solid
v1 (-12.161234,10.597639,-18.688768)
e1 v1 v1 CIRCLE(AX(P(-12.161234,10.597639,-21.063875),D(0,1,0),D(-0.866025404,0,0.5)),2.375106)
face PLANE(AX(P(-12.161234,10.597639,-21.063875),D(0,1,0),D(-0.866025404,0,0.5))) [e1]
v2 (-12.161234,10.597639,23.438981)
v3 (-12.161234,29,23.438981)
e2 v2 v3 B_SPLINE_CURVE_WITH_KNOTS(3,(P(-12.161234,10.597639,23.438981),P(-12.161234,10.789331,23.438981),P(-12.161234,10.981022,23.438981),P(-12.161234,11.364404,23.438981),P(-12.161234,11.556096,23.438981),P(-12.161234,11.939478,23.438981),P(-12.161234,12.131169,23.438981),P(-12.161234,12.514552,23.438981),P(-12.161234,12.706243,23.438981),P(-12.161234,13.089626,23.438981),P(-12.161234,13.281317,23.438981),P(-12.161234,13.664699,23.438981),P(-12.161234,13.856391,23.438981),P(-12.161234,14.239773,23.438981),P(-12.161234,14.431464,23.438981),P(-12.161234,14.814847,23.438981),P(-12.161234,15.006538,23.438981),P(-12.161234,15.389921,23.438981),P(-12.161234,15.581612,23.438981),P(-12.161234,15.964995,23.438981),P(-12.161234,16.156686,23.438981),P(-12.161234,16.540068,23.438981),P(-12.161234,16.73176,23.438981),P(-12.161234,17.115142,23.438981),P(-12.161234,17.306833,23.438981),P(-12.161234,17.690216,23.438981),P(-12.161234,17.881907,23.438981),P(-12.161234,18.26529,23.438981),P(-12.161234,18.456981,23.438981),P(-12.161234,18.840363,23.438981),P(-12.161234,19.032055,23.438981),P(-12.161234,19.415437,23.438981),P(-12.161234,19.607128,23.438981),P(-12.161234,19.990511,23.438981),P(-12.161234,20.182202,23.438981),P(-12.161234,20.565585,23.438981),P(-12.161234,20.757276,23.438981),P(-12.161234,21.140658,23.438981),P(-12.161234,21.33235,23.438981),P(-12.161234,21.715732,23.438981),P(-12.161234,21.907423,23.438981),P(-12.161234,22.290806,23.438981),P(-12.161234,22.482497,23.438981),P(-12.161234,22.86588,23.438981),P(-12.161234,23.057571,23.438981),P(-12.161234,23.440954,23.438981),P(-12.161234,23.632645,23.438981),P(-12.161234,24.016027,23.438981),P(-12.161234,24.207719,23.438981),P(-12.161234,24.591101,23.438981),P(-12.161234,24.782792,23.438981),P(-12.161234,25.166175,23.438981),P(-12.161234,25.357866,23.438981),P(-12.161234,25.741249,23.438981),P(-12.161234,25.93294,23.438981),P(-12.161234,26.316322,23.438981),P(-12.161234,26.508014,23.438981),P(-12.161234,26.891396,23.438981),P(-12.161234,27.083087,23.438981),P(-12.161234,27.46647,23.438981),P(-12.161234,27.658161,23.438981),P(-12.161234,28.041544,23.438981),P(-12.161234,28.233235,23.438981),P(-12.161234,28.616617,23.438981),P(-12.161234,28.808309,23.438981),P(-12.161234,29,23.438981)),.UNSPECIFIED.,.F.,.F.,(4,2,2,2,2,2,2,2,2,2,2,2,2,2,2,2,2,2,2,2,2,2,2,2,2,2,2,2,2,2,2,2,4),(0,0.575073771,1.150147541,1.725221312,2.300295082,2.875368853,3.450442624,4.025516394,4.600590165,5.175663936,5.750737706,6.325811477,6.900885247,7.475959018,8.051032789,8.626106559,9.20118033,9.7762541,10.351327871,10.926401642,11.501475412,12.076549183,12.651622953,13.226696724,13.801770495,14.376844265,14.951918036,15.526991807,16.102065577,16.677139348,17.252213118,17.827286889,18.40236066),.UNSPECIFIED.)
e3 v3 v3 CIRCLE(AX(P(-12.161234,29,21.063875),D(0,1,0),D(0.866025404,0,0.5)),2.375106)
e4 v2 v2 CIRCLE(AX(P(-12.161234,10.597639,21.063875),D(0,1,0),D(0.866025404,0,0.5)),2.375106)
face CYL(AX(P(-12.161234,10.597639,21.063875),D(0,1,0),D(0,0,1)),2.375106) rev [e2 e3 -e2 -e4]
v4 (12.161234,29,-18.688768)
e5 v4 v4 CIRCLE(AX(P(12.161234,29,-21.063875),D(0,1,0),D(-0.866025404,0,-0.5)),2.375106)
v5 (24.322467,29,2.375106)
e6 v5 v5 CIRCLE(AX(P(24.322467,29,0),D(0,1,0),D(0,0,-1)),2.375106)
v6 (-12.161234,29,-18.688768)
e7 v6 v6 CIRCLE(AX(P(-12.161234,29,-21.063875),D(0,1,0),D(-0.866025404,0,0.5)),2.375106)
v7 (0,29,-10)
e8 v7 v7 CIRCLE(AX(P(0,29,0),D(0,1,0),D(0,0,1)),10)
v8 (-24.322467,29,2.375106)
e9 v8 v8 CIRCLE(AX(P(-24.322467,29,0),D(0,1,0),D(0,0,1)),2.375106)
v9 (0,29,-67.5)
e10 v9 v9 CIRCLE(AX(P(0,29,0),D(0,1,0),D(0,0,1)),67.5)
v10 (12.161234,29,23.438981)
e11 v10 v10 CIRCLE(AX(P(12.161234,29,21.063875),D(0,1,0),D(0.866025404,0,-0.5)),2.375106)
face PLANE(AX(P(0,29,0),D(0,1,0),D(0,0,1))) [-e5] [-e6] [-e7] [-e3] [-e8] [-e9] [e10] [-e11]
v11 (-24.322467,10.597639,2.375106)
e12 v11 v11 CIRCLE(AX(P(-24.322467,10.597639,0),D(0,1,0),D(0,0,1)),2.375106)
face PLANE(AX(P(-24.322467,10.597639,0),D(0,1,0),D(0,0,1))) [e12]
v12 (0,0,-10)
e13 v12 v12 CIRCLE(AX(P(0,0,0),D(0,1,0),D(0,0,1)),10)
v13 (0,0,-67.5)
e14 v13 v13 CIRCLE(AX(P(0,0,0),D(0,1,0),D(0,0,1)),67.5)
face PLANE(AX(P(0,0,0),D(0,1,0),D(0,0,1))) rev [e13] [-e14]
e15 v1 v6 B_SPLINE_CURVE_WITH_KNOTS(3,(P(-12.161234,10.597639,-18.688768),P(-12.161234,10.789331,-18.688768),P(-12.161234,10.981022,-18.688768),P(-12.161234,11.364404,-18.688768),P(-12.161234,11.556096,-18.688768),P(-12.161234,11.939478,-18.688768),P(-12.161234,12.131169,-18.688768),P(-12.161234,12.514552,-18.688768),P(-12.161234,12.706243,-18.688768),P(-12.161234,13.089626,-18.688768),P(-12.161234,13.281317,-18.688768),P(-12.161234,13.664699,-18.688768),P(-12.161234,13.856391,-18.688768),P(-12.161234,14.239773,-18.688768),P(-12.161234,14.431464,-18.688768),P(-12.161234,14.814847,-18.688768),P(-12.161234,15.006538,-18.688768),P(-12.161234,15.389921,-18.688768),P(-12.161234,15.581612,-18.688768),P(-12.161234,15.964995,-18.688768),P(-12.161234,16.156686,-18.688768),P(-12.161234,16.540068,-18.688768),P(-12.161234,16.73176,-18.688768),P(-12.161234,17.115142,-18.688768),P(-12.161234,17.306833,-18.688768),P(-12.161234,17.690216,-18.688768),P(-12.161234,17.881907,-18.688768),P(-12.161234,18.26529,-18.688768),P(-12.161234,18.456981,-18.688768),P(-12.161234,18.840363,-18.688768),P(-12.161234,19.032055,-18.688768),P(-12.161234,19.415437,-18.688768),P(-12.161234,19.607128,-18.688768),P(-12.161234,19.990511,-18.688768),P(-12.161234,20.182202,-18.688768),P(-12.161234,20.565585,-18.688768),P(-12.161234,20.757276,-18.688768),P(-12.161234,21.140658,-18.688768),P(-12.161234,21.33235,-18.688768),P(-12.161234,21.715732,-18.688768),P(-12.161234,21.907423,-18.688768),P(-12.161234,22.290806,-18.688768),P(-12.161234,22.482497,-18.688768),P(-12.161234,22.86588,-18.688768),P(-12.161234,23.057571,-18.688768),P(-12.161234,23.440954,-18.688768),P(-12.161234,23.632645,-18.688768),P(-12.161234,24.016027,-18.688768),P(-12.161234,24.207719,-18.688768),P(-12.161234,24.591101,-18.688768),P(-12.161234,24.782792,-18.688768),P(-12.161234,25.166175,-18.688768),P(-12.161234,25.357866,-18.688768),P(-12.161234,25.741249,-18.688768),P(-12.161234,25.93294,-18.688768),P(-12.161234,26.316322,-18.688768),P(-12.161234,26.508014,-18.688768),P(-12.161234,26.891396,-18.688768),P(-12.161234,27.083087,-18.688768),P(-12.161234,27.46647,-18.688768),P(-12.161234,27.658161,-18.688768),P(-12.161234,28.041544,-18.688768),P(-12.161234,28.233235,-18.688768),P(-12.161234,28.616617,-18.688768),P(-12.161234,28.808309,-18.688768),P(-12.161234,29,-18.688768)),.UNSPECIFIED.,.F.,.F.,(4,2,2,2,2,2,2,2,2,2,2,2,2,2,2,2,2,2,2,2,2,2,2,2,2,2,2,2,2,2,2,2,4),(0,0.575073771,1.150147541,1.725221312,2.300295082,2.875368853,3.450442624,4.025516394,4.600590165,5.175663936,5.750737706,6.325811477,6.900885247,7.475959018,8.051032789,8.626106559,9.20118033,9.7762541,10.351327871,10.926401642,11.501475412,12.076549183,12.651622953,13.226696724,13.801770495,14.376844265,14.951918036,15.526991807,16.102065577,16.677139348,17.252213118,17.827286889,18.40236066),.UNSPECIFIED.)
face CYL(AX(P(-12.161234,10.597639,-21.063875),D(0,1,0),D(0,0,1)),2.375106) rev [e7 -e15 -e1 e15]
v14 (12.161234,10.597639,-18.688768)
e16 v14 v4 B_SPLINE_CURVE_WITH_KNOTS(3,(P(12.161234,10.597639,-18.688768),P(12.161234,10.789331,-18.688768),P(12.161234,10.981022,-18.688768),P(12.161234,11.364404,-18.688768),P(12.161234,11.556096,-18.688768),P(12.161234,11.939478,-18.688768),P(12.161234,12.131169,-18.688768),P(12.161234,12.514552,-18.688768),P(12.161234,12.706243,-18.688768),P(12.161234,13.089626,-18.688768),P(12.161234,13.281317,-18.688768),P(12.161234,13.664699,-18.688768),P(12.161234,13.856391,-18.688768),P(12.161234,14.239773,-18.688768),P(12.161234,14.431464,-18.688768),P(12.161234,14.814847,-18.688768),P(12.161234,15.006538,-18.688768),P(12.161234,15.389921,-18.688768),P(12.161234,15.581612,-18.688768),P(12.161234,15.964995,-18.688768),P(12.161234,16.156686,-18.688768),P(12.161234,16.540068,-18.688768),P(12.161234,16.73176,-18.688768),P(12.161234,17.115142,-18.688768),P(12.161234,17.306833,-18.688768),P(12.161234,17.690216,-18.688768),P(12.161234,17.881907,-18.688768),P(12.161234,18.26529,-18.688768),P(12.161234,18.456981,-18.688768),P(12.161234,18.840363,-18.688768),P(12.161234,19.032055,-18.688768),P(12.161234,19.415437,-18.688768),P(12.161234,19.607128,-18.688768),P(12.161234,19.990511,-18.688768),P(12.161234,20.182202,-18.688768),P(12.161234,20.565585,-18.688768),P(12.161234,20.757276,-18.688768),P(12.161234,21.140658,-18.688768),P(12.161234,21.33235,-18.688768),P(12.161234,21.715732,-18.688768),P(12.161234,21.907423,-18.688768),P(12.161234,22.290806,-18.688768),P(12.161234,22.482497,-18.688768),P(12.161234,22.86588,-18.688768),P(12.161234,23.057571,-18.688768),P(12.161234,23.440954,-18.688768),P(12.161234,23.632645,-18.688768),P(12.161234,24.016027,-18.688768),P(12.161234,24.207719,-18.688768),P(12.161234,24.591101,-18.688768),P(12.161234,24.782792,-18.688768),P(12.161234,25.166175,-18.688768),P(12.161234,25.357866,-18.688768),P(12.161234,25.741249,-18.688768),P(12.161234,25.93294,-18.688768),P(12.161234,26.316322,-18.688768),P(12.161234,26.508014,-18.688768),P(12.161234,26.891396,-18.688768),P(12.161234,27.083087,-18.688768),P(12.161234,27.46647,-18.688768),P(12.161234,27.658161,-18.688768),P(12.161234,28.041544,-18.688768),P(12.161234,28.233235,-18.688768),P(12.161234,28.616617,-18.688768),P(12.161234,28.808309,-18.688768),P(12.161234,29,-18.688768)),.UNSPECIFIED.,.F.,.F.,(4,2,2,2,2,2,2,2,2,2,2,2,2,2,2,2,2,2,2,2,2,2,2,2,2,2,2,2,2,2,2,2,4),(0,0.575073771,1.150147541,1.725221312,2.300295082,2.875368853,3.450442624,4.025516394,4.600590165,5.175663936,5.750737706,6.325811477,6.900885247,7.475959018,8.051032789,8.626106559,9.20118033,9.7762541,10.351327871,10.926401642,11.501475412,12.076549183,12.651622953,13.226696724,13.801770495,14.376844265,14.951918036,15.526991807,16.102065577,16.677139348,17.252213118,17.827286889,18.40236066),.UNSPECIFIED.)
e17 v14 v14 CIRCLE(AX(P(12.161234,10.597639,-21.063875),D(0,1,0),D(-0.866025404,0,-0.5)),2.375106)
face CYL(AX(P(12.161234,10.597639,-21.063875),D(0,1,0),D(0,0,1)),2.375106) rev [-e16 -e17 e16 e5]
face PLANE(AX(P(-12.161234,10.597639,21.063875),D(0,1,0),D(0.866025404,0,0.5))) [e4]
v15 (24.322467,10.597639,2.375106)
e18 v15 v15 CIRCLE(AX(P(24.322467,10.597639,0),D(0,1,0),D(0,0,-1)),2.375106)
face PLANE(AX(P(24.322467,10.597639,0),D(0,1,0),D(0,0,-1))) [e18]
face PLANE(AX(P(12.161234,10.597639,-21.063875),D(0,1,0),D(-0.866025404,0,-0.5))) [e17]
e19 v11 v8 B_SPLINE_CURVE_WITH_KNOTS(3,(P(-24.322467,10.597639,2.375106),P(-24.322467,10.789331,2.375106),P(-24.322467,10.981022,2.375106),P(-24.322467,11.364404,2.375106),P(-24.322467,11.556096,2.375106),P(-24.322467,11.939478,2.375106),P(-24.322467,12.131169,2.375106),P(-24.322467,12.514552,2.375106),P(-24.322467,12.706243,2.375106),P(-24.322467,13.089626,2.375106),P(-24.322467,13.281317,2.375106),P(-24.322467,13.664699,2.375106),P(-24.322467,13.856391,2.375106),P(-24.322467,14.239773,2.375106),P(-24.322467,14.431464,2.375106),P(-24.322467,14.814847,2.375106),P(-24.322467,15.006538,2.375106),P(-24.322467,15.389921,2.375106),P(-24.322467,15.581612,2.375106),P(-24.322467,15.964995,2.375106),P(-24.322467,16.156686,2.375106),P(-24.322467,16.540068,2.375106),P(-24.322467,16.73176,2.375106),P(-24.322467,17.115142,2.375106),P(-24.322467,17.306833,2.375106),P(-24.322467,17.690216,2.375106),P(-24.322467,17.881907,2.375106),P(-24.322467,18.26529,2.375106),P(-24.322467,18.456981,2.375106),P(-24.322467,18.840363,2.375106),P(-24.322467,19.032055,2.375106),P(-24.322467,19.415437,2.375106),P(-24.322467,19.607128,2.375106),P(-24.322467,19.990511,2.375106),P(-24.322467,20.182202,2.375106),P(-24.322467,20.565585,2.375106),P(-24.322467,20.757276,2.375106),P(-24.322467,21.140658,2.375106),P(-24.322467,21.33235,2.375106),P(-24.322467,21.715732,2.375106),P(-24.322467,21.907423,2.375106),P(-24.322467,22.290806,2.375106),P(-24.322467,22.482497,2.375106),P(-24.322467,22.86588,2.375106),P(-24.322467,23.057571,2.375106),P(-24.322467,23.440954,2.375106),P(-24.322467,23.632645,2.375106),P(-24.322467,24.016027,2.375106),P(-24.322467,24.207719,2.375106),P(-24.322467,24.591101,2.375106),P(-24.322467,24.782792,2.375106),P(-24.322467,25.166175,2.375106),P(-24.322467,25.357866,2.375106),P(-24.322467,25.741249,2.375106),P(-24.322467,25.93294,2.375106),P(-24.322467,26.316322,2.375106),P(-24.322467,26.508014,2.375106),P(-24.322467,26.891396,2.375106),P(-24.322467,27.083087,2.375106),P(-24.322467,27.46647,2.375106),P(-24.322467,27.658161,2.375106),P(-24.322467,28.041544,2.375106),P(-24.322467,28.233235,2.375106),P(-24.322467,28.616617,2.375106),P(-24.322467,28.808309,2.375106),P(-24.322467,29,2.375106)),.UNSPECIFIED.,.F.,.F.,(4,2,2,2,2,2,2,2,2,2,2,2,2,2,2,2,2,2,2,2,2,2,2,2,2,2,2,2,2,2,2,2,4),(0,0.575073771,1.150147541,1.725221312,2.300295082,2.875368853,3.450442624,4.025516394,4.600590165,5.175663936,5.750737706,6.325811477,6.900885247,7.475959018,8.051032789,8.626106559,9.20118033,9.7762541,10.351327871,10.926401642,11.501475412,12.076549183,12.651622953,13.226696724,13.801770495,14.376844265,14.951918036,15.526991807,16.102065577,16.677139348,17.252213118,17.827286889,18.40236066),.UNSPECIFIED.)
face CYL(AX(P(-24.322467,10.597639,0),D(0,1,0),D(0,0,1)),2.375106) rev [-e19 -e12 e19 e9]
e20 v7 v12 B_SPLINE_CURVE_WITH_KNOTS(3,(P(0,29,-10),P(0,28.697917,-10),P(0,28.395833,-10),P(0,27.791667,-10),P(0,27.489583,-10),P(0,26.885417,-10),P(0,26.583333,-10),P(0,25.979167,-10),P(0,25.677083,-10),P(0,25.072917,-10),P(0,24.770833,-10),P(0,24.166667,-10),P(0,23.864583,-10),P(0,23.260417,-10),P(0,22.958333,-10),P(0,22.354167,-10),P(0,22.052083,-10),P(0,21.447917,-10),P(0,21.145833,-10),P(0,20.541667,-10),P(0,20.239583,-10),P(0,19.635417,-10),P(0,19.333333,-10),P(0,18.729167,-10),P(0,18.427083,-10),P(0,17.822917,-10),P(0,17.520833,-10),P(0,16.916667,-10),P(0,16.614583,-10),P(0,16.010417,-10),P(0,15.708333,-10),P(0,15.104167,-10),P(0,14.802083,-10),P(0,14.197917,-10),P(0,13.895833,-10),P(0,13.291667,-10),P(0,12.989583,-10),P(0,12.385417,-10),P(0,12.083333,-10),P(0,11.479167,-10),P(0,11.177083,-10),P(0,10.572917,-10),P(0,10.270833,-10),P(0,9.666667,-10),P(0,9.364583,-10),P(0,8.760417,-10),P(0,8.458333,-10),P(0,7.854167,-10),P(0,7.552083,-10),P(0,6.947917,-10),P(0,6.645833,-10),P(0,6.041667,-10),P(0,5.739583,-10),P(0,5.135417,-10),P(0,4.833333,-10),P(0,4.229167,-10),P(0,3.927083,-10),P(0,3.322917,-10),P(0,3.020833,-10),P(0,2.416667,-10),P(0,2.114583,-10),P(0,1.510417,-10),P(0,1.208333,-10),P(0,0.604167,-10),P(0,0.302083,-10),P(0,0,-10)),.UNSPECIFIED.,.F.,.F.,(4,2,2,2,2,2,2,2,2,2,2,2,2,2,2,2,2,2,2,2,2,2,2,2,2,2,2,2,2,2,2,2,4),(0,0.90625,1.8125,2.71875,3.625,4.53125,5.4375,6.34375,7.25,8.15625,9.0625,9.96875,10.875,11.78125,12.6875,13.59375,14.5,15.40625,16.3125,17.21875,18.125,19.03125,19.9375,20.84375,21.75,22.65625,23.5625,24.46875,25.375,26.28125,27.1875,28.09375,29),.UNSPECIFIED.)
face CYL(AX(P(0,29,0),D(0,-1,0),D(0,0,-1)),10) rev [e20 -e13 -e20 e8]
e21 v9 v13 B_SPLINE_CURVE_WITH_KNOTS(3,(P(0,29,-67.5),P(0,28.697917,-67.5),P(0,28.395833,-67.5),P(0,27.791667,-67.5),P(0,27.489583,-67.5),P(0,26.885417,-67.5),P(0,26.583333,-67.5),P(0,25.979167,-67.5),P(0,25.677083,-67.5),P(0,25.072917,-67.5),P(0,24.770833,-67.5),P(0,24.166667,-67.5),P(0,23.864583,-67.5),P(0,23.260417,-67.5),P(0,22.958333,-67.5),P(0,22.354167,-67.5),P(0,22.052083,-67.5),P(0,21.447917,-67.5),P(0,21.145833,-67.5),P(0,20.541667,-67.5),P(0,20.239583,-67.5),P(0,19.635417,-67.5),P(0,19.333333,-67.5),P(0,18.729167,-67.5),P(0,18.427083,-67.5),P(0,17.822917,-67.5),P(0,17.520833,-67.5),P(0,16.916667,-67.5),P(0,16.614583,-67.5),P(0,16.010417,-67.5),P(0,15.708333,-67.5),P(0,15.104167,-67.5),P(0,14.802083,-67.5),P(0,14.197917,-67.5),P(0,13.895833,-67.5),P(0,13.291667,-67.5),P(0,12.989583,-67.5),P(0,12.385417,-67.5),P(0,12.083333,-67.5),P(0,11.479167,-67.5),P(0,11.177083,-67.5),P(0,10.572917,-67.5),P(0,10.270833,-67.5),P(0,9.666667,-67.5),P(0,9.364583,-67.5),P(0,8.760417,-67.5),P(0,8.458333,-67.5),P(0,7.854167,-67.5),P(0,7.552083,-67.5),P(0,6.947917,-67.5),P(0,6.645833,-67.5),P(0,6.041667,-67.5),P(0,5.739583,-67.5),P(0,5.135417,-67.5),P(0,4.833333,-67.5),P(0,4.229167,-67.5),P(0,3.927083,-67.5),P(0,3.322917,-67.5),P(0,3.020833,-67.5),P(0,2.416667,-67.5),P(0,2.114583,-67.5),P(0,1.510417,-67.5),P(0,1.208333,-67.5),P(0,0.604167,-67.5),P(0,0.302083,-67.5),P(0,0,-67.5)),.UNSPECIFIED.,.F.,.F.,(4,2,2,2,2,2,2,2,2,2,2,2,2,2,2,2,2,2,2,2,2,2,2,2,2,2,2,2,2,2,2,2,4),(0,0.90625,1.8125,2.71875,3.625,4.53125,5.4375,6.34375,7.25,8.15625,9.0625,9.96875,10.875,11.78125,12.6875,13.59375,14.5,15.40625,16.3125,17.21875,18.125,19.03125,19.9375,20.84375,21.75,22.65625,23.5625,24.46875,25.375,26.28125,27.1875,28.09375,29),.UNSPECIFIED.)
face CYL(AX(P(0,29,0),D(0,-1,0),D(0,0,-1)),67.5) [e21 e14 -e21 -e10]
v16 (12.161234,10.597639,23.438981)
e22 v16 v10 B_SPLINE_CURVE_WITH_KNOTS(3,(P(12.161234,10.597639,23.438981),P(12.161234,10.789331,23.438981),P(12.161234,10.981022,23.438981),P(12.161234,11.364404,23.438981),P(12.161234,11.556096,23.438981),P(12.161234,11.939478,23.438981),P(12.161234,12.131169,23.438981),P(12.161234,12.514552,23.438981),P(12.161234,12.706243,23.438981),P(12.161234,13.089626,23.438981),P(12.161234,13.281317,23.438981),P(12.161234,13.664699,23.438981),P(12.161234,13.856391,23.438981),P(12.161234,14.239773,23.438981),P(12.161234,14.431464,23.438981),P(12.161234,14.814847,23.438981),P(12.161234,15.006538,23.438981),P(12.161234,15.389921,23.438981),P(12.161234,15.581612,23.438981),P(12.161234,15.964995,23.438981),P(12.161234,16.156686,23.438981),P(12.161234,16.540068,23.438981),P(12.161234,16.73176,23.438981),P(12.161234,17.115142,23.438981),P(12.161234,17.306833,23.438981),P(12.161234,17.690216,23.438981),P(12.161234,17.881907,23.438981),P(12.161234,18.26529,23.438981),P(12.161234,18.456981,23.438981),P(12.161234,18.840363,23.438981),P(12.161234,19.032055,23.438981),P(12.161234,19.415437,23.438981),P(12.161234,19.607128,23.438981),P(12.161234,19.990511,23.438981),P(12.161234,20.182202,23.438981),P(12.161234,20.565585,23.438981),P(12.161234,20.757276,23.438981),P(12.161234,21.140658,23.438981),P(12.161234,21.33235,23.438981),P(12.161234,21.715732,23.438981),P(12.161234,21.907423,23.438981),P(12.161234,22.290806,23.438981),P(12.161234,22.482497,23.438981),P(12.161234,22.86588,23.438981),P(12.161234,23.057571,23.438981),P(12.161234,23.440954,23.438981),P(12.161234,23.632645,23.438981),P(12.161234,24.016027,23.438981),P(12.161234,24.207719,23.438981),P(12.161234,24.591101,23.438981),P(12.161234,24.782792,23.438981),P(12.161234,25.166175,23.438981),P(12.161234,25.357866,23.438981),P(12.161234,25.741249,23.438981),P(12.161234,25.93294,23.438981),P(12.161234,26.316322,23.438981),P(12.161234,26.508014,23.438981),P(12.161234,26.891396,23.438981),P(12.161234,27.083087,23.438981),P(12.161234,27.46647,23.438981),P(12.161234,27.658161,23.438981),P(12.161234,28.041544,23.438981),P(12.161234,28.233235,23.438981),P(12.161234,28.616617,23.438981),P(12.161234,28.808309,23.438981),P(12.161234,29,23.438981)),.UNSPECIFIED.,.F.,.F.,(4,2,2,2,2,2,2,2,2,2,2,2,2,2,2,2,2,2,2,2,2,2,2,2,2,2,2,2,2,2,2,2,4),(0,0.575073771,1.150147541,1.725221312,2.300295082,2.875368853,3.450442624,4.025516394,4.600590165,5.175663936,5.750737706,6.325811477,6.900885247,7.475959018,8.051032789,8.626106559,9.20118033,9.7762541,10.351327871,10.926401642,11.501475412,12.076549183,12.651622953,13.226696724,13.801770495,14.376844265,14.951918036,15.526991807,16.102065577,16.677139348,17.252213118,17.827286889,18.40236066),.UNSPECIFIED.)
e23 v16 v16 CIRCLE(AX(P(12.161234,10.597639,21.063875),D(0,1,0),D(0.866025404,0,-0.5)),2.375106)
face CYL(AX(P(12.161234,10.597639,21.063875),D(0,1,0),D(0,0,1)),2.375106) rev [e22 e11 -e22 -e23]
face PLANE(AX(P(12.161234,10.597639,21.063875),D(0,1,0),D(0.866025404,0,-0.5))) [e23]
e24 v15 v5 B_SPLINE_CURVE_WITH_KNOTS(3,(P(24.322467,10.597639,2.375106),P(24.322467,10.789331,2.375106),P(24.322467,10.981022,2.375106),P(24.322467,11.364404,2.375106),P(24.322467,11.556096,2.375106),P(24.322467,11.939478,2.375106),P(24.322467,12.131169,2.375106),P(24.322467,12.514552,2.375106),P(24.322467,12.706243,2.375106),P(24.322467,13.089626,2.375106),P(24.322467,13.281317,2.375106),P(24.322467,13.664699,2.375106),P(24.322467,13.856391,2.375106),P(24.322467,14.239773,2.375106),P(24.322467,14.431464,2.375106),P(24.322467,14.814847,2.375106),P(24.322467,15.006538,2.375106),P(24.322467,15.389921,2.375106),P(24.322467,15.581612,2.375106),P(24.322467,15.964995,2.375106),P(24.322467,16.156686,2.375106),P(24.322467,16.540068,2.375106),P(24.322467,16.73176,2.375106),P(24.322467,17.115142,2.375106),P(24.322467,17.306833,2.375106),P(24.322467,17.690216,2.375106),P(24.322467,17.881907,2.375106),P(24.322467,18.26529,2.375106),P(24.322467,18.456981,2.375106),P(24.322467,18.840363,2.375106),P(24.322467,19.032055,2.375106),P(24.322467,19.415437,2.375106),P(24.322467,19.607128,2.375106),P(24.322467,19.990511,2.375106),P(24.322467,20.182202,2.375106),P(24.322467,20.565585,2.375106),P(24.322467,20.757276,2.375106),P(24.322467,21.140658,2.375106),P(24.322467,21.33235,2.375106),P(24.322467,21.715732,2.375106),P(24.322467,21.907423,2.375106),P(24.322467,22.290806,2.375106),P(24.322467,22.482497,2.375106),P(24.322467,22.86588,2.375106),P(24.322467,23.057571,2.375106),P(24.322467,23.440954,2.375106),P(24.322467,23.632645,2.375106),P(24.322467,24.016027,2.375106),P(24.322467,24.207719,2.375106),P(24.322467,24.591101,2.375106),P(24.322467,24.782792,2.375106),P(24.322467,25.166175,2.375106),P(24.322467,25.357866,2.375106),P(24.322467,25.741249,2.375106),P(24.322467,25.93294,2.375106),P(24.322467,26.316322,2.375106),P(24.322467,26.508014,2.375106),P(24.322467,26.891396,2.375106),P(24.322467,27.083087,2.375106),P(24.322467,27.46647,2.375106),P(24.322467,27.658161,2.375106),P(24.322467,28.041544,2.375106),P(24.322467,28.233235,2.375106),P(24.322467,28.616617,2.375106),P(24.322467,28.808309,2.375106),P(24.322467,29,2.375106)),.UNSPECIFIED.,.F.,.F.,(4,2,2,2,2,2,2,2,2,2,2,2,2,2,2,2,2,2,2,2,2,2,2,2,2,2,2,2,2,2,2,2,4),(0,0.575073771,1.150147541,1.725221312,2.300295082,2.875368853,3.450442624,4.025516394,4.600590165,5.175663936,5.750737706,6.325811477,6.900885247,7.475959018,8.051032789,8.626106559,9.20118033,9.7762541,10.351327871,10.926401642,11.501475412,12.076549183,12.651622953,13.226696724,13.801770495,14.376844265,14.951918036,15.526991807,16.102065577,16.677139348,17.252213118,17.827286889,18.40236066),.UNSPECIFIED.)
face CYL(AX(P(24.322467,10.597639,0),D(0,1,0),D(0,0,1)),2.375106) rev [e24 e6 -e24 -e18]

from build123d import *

# Parameters (mm, degrees)
SKETCH1_R           = 67.5
BOSS_EXTRUDE1_DEPTH = 29
SKETCH2_R           = 10
CUT_EXTRUDE1_DEPTH  = 100.767229089
SKETCH3_R           = 2.375106061
CUT_EXTRUDE2_DEPTH  = 18.40236066
CIRPATTERN1_COUNT   = 6


with BuildPart() as part:
    # Sketch1 → Boss-Extrude1 (new body)
    with BuildSketch(Plane(origin=(0, 0, 0), x_dir=(1, 0, 0), z_dir=(0, 1, 0))):
        Circle(SKETCH1_R)
    extrude(amount=BOSS_EXTRUDE1_DEPTH)

    # Sketch2 → Cut-Extrude1 (cut, through all)
    with BuildSketch(Plane(origin=(0, 0, 0), x_dir=(1, 0, 0), z_dir=(0, 1, 0))):
        Circle(SKETCH2_R)
    extrude(amount=CUT_EXTRUDE1_DEPTH, mode=Mode.SUBTRACT)

    # Sketch3 → Cut-Extrude2 (cut)
    with BuildSketch(Plane(origin=(0, 29, 0), x_dir=(1, 0, 0), z_dir=(0, 1, 0))):
        with Locations((-24.322467229, 0)):
            Circle(SKETCH3_R)
    cut_extrude2 = extrude(amount=-CUT_EXTRUDE2_DEPTH, mode=Mode.SUBTRACT)

    # CirPattern1: Cut-Extrude2 ×6 about axis
    cirpattern1_axis = Axis((0, 0, 0), (0, 1, 0))
    for i in range(1, CIRPATTERN1_COUNT):
        add(cut_extrude2.rotate(cirpattern1_axis, i * 360 / CIRPATTERN1_COUNT), mode=Mode.SUBTRACT)


solid = part.part
